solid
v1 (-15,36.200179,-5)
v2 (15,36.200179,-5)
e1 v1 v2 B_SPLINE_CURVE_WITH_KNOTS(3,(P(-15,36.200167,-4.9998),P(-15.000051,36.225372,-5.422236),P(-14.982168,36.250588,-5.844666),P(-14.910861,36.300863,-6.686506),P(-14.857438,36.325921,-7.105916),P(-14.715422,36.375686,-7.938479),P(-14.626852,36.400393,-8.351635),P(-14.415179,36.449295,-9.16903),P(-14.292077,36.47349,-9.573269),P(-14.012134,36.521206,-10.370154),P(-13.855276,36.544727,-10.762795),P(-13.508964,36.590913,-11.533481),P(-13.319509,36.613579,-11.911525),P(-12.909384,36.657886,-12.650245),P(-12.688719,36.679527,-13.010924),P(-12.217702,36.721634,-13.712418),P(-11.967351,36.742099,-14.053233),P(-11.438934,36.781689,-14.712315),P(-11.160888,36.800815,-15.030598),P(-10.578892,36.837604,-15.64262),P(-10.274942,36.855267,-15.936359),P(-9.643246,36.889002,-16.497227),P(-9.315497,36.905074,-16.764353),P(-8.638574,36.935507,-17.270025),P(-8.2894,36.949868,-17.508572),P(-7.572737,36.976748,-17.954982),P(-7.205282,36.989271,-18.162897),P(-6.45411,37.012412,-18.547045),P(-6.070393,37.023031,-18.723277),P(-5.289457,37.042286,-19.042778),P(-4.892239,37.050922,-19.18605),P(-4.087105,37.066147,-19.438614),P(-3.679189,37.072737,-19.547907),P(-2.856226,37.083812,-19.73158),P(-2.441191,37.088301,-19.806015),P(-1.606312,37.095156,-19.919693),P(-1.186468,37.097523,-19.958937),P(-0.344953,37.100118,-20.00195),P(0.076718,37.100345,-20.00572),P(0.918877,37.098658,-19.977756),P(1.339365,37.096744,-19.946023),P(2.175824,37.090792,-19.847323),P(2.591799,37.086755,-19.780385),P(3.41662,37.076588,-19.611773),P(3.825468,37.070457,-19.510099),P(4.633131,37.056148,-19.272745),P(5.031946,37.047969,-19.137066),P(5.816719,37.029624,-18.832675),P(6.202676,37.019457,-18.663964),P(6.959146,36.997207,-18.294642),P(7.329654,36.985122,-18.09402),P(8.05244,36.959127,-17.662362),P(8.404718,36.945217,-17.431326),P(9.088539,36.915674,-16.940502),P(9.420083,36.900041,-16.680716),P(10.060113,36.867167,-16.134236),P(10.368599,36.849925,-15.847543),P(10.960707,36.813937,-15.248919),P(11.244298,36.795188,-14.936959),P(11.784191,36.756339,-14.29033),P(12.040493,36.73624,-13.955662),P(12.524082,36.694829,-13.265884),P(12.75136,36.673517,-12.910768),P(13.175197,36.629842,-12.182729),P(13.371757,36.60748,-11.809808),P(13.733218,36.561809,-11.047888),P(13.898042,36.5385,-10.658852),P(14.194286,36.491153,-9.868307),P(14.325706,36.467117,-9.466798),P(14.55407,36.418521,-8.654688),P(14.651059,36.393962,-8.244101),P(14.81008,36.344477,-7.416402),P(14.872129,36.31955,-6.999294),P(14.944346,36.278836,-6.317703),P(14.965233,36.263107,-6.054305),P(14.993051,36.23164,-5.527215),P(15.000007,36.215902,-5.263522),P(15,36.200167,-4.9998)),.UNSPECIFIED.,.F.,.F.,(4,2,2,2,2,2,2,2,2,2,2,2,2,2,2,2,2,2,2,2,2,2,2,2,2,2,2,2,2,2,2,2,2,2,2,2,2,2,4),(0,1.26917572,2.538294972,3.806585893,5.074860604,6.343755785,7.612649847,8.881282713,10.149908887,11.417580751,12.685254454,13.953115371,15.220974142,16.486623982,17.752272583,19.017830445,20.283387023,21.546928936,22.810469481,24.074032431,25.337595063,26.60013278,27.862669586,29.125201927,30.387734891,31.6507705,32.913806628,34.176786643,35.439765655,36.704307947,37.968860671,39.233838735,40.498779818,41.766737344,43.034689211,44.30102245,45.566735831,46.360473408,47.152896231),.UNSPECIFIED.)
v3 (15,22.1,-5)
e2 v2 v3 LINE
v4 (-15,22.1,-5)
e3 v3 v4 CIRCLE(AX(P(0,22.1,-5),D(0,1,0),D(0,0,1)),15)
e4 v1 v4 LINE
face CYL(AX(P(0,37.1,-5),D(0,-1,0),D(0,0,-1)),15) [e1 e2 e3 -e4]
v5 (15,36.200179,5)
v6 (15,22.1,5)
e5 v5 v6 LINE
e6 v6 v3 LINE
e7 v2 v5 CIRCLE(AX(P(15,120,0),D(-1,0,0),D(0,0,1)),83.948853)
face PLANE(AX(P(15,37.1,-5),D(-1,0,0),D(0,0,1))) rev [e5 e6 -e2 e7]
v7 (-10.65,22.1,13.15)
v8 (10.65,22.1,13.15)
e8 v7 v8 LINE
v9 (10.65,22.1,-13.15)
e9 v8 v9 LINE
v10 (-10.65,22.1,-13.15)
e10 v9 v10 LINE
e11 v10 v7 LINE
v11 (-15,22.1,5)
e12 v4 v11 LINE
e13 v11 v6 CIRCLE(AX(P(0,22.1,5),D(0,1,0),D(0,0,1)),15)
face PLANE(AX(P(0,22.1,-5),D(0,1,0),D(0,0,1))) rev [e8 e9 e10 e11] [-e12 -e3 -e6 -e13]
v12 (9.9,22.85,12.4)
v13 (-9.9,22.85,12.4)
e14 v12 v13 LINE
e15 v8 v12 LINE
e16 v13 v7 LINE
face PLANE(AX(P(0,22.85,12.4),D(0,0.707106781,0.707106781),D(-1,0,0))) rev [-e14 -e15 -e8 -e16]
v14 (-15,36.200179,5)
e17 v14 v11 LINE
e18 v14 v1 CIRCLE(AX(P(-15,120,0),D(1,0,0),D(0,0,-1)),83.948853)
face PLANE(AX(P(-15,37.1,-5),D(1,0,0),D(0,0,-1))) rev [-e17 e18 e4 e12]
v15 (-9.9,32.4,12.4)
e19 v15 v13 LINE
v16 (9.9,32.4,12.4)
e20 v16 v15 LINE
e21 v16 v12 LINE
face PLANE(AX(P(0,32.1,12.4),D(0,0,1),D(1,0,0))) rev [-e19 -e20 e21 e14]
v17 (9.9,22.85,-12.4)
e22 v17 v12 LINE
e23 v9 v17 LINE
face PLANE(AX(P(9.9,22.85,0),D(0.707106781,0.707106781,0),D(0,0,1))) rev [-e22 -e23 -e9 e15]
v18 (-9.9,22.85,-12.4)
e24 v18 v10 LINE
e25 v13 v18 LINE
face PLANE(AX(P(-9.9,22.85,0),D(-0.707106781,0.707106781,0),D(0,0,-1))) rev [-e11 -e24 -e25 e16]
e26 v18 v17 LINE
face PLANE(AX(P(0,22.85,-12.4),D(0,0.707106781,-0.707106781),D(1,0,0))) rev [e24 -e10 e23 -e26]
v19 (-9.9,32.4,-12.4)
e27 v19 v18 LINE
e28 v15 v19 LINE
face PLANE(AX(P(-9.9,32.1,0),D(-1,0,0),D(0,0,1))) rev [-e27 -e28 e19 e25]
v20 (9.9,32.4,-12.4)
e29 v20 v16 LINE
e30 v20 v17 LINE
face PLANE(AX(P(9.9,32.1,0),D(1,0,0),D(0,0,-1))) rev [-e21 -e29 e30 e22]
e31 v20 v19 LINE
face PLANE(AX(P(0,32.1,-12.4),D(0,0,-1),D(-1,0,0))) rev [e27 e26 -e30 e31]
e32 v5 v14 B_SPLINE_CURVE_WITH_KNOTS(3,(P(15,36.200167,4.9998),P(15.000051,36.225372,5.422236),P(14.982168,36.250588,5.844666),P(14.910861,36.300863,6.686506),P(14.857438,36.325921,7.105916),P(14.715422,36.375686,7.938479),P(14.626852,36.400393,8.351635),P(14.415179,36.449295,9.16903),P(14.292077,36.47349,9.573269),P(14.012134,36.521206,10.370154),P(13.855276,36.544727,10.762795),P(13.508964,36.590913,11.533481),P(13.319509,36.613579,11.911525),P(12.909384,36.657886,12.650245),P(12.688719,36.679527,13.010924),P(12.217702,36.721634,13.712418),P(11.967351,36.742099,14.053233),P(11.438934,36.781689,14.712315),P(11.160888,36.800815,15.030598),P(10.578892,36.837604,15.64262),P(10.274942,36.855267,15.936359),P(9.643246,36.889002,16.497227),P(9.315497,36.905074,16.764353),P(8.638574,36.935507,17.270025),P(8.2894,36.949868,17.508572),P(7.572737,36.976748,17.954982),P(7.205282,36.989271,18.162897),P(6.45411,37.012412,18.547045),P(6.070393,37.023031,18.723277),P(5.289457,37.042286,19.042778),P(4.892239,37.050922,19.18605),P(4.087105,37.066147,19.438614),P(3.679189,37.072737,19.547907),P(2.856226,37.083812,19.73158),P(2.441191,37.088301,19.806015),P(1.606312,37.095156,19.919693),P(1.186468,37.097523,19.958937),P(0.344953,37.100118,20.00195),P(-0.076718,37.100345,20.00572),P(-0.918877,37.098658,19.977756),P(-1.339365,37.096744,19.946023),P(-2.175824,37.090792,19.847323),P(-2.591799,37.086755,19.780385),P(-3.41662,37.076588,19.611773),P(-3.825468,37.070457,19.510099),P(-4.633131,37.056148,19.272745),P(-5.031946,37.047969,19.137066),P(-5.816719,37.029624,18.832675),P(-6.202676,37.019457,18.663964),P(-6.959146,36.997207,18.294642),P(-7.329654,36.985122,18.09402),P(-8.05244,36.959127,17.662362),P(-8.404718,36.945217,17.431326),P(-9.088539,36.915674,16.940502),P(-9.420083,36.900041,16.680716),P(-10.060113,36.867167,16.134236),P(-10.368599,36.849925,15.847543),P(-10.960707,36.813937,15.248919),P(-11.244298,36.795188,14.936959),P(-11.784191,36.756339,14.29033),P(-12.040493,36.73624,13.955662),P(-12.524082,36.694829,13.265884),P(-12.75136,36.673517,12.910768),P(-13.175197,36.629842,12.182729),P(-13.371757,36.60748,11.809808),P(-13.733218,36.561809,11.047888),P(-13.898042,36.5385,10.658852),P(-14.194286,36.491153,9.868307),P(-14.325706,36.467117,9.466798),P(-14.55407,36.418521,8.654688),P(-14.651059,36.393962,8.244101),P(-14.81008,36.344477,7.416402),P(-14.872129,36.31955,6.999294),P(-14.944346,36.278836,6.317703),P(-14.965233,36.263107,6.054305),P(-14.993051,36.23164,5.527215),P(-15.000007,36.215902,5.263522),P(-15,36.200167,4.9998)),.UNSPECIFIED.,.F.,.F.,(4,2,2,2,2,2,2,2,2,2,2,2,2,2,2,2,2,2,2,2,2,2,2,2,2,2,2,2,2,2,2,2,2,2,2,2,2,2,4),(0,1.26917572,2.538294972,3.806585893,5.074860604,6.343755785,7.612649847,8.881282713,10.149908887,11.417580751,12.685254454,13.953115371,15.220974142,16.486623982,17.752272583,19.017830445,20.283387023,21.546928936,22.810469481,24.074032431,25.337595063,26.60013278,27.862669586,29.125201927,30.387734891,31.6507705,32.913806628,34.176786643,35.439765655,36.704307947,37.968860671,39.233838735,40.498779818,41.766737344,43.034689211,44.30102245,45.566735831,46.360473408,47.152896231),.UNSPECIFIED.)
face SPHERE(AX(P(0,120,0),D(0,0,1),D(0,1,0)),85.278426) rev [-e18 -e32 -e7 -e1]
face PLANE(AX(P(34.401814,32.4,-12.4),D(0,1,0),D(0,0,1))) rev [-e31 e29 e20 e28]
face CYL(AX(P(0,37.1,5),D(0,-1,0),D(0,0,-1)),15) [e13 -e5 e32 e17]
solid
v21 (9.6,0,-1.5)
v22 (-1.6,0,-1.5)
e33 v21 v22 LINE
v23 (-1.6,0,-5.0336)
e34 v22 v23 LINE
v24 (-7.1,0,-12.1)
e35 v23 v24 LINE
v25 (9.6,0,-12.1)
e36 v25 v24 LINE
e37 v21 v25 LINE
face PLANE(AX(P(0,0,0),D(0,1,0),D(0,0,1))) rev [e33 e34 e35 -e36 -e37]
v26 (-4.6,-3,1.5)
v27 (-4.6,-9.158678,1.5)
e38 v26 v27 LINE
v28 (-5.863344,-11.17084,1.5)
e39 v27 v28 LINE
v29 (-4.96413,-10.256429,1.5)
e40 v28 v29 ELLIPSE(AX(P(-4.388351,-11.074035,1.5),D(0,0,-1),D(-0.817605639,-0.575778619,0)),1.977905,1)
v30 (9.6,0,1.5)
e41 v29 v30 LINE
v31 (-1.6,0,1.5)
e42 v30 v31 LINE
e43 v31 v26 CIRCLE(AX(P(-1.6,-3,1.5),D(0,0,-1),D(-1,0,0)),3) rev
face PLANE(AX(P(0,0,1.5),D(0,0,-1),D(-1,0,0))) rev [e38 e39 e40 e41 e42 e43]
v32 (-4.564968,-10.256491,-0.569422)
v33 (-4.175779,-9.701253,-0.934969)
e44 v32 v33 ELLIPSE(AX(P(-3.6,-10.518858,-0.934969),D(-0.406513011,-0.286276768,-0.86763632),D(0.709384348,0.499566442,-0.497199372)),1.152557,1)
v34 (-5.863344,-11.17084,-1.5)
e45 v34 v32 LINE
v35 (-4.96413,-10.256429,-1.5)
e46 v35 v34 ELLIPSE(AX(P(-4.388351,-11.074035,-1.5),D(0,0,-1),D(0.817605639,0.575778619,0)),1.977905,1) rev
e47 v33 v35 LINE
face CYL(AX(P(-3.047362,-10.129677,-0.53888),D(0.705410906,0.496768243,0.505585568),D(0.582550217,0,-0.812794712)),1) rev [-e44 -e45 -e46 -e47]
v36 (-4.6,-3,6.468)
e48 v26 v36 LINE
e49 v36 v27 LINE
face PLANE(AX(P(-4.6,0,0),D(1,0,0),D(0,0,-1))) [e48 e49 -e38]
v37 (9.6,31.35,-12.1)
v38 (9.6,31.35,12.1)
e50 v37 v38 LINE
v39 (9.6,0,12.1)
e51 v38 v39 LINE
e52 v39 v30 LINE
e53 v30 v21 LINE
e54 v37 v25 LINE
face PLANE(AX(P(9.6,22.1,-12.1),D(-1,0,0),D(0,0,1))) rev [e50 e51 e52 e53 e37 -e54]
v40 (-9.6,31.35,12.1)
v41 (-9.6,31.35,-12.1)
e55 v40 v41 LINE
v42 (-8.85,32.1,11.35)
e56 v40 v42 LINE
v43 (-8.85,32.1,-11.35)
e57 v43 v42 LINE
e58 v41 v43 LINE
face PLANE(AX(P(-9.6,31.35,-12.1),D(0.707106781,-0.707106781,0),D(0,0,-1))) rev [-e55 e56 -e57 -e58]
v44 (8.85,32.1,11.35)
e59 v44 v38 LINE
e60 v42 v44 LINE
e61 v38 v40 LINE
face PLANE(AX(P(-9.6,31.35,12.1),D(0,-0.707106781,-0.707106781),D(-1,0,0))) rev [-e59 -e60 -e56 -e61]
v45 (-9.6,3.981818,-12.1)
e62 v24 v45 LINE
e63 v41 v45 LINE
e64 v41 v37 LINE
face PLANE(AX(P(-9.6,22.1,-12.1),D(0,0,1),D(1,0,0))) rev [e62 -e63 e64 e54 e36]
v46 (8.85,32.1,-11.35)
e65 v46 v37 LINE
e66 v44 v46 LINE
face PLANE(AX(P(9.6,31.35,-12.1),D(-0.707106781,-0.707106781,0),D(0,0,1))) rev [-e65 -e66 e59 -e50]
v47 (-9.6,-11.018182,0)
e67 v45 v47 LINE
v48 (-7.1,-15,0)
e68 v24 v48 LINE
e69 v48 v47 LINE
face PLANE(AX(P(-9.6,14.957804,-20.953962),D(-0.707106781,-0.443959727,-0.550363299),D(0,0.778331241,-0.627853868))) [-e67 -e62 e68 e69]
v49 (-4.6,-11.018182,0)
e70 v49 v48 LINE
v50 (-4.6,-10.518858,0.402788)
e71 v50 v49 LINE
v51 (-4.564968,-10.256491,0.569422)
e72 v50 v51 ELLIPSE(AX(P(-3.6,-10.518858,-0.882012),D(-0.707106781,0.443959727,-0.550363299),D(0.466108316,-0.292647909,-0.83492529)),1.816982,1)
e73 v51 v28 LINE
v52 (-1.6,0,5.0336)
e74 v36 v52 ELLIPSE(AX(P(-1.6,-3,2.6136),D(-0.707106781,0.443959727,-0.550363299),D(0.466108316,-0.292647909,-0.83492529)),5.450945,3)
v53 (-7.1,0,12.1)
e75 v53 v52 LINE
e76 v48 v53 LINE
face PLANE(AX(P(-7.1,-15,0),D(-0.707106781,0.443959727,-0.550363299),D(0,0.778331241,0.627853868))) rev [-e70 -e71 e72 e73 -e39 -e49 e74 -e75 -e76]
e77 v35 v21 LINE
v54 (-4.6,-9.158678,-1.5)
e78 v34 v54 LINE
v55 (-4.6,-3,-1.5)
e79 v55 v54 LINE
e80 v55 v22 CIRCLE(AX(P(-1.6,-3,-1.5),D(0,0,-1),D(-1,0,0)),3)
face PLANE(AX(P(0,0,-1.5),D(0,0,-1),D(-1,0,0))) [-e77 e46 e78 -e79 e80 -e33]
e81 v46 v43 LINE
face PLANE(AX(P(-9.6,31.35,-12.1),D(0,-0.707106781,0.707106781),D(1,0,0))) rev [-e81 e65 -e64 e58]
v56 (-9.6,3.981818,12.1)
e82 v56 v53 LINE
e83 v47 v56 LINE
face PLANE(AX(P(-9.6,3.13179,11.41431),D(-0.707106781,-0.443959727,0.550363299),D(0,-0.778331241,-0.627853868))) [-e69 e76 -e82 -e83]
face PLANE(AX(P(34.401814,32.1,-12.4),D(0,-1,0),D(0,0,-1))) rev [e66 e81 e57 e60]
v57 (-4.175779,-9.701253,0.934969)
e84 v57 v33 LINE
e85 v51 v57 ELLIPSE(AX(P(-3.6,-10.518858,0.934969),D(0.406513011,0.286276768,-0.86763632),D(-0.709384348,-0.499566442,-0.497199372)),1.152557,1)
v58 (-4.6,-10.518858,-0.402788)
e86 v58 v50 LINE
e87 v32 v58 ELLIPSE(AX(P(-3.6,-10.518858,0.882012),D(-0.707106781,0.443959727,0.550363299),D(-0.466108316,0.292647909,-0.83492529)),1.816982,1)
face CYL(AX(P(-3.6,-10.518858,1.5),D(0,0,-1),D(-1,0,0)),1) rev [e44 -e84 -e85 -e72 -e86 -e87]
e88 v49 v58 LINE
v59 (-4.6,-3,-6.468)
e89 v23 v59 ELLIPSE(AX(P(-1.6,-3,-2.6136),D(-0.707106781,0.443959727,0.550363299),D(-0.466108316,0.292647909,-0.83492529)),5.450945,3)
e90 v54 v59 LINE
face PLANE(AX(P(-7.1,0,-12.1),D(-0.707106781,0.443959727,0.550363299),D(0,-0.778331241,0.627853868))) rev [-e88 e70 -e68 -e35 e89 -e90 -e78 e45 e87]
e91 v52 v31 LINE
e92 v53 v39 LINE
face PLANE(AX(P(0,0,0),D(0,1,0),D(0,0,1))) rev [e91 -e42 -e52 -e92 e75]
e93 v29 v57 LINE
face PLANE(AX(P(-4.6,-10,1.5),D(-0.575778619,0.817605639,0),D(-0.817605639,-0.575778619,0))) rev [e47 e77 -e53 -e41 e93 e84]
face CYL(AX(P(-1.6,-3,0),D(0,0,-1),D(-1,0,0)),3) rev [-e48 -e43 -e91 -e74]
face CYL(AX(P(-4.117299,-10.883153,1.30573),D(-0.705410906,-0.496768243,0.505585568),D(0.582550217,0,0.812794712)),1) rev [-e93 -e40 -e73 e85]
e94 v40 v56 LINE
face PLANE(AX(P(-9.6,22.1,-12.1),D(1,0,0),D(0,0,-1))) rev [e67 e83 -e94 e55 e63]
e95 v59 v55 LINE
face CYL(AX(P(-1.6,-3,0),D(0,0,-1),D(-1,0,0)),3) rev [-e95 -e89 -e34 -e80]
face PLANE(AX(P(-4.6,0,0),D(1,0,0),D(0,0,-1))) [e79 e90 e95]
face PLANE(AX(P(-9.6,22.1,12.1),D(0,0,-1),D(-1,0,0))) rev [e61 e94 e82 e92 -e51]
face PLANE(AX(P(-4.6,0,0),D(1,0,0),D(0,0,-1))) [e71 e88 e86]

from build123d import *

# Parameters (mm, degrees)
SKETCH1_W               = 19.2
SKETCH1_H               = 24.2
BOSS_EXTRUDE1_DEPTH     = 22.1
BOSS_EXTRUDE2_DEPTH     = 15
BOSS_EXTRUDE3_DEPTH     = 5
BOSS_EXTRUDE4_DEPTH     = 1.5
CHAMFER1_SIZE           = 2.5
FILLET1_R               = 3
SKETCH9_W               = 19.8
SKETCH9_H               = 24.8
SKETCH9_W_2             = 19.2
SKETCH9_H_2             = 24.2
CUT_EXTRUDE_THIN1_DEPTH = 10
SKETCH10_W              = 24.8
SKETCH10_H              = 0.3
CUT_EXTRUDE1_DEPTH      = 19.2
SKETCH12_W              = 19.8
SKETCH12_H              = 24.8
CUT_EXTRUDE3_DEPTH      = 0.3
CHAMFER2_SIZE           = 0.75
CHAMFER3_SIZE           = 0.75
FILLET2_R               = 1


with BuildPart() as part:
    # Sketch1 → Boss-Extrude1 (new body)
    with BuildSketch(Plane(origin=(0, 0, 0), x_dir=(1, 0, 0), z_dir=(0, 1, 0))):
        Rectangle(SKETCH1_W, SKETCH1_H)
    extrude(amount=BOSS_EXTRUDE1_DEPTH)

    # Sketch2 → Boss-Extrude2 (add)
    with BuildSketch(Plane(origin=(0, 22.1, 0), x_dir=(1, 0, 0), z_dir=(0, 1, 0))):
        with BuildLine():
            Line((15, 5), (15, -5))
            ThreePointArc((15, -5), (0, -20), (-15, -5))
            Line((-15, -5), (-15, 5))
            ThreePointArc((-15, 5), (0, 20), (15, 5))
        make_face()
    extrude(amount=BOSS_EXTRUDE2_DEPTH)

    # Sketch4 → Boss-Extrude3 (add)
    with BuildSketch(Plane.ZY.offset(9.6)):
        Polygon((-12.1, 0), (0, -15), (12.1, 0), align=None)
    extrude(amount=-BOSS_EXTRUDE3_DEPTH)

    # Sketch6 → Boss-Extrude4 (add, symmetric)
    with BuildSketch(Plane.XY):
        Polygon((-4.6, -10), (9.6, 0), (-4.6, 0), align=None)
    extrude(amount=BOSS_EXTRUDE4_DEPTH, both=True)

    # Chamfer1
    # the kernel refuses this chamfer: 2.5 mm, written as the material it takes off along each edge
    with BuildSketch(Plane(origin=(-9.6, 5.004053029, -16.136602777), x_dir=(-0.02749587661058631, 0.6276164868252809, 0.7780369671387777), z_dir=(0, -0.7783312410184162, 0.6278538677548561)), Plane(origin=(-9.6, -20.004053029, -4.036602777), x_dir=(-0.027495876610586317, 0.6276164868252805, -0.778036967138778), z_dir=(0, 0.7783312410184164, 0.6278538677548556))) as chamfer1_piece_1:
        Polygon((CHAMFER1_SIZE * 0.999621916911, -CHAMFER1_SIZE * 0.0274958766106), (-CHAMFER1_SIZE * 0.0274958766106, -CHAMFER1_SIZE * 0.999621916911), (0, 0), align=None)
    extrude(amount=32.130415355, mode=Mode.SUBTRACT)
    with BuildSketch(Plane(origin=(-4.6, 5.004053029, -16.136602777), x_dir=(-0.9996219169112968, -0.017263392477266982, -0.02140089976520685), z_dir=(0, -0.7783312410184162, 0.6278538677548561))) as chamfer1_piece_2_section:
        Polygon((CHAMFER1_SIZE * 0.999621916911, -CHAMFER1_SIZE * 0.0274958766106), (-CHAMFER1_SIZE * 0.0274958766106, -CHAMFER1_SIZE * 0.999621916911), (0, 0), align=None)
    chamfer1_piece_2 = extrude(amount=32.130415355, mode=Mode.PRIVATE)
    chamfer1_piece_2 = split(chamfer1_piece_2, bisect_by=Plane(origin=(-5.457746671, 0, -6.779130054), z_dir=(0, -1, 0)), keep=Keep.TOP, mode=Mode.PRIVATE)
    chamfer1_piece_2 = split(chamfer1_piece_2, bisect_by=Plane(origin=(-5.457746671, -5.291671114, -1.5), z_dir=(0, 0, -1)), keep=Keep.TOP, mode=Mode.PRIVATE)
    add(chamfer1_piece_2, mode=Mode.SUBTRACT)
    with BuildSketch(Plane(origin=(-4.6, 5.004053029, -16.136602777), x_dir=(-0.9996219169112968, -0.017263392477266982, -0.02140089976520685), z_dir=(0, -0.7783312410184162, 0.6278538677548561))) as chamfer1_piece_3_section:
        Polygon((CHAMFER1_SIZE * 0.999621916911, -CHAMFER1_SIZE * 0.0274958766106), (-CHAMFER1_SIZE * 0.0274958766106, -CHAMFER1_SIZE * 0.999621916911), (0, 0), align=None)
    chamfer1_piece_3 = extrude(amount=32.130415355, mode=Mode.PRIVATE)
    chamfer1_piece_3 = split(chamfer1_piece_3, bisect_by=Plane(origin=(-6.522169722, -11.35364065, -0.439205928), z_dir=(0.5757786192909291, -0.8176056393931194, 0)), keep=Keep.TOP, mode=Mode.PRIVATE)
    add(chamfer1_piece_3, mode=Mode.SUBTRACT)
    with BuildSketch(Plane(origin=(-4.6, -20.004053029, -4.036602777), x_dir=(-0.9996219169112968, -0.017263392477266715, 0.021400899765206826), z_dir=(0, 0.7783312410184164, 0.6278538677548556))) as chamfer1_piece_4_section:
        Polygon((CHAMFER1_SIZE * 0.999621916911, -CHAMFER1_SIZE * 0.0274958766106), (-CHAMFER1_SIZE * 0.0274958766106, -CHAMFER1_SIZE * 0.999621916911), (0, 0), align=None)
    chamfer1_piece_4 = extrude(amount=32.130415355, mode=Mode.PRIVATE)
    chamfer1_piece_4 = split(chamfer1_piece_4, bisect_by=Plane(origin=(-6.522169722, -11.35364065, 0.439205928), z_dir=(0.5757786192909291, -0.8176056393931194, 0)), keep=Keep.TOP, mode=Mode.PRIVATE)
    add(chamfer1_piece_4, mode=Mode.SUBTRACT)
    with BuildSketch(Plane(origin=(-4.6, -20.004053029, -4.036602777), x_dir=(-0.9996219169112968, -0.017263392477266715, 0.021400899765206826), z_dir=(0, 0.7783312410184164, 0.6278538677548556))) as chamfer1_piece_5_section:
        Polygon((CHAMFER1_SIZE * 0.999621916911, -CHAMFER1_SIZE * 0.0274958766106), (-CHAMFER1_SIZE * 0.0274958766106, -CHAMFER1_SIZE * 0.999621916911), (0, 0), align=None)
    chamfer1_piece_5 = extrude(amount=32.130415355, mode=Mode.PRIVATE)
    chamfer1_piece_5 = split(chamfer1_piece_5, bisect_by=Plane(origin=(-5.457746671, 0, 6.779130054), z_dir=(0, -1, 0)), keep=Keep.TOP, mode=Mode.PRIVATE)
    chamfer1_piece_5 = split(chamfer1_piece_5, bisect_by=Plane(origin=(-5.457746671, -5.291671114, 1.5), z_dir=(0, 0, 1)), keep=Keep.TOP, mode=Mode.PRIVATE)
    add(chamfer1_piece_5, mode=Mode.SUBTRACT)

    # Fillet1
    fillet1_edges = [part.edges().sort_by_distance(p)[0] for p in [
        (-4.6, 0, -5.193999965),
        (-4.6, 0, 5.193999965),
    ]]
    fillet(fillet1_edges, radius=FILLET1_R)

    # Sketch8 → Cut-Revolve3 (revolve, cut)
    with BuildSketch(Plane(origin=(0, 0, 0), x_dir=(0, 0, -1), z_dir=(1, 0, 0))):
        with BuildLine():
            Line((-85.278426346, 120), (85.278426346, 120))
            ThreePointArc((85.278426346, 120), (0, 34.721573654), (-85.278426346, 120))
        make_face()
    revolve(axis=Axis((0, 120, 85.278426346), (0, 0, -1)), mode=Mode.SUBTRACT)

    # Sketch9 → Cut-Extrude-Thin1 (cut)
    with BuildSketch(Plane.XZ.offset(-22.1)):
        Rectangle(SKETCH9_W, SKETCH9_H)
        Rectangle(SKETCH9_W_2, SKETCH9_H_2, mode=Mode.SUBTRACT)
    extrude(amount=-CUT_EXTRUDE_THIN1_DEPTH, mode=Mode.SUBTRACT)

    # Sketch10 → Cut-Extrude1 (cut)
    with BuildSketch(Plane.ZY.offset(9.6)):
        with Locations((0, 32.25)):
            Rectangle(SKETCH10_W, SKETCH10_H)
    extrude(amount=-CUT_EXTRUDE1_DEPTH, mode=Mode.SUBTRACT)


with BuildPart() as cut_extrude1_piece_1:
    # of the separate pieces the step leaves, piece 1, a body of its own (cut_extrude1_pieces)
    add(part.part.solids().sort_by_distance((-4.6, -3, -6.467999931))[0])

    # Chamfer3
    chamfer3_edges = [cut_extrude1_piece_1.edges().sort_by_distance(p)[0] for p in [
        (0, 32.1, -12.1),
        (9.6, 32.1, 0),
        (0, 32.1, 12.1),
        (-9.6, 32.1, 0),
    ]]
    chamfer(chamfer3_edges, length=CHAMFER3_SIZE)

    # Fillet2
    fillet2_edges = [cut_extrude1_piece_1.edges().sort_by_distance(p)[0] for p in [
        (-4.6, -10, 0),
        (-5.073449943, -10.333415453, -1.160666632),
        (-5.073449943, -10.333415453, 1.160666632),
    ]]
    fillet(fillet2_edges, radius=FILLET2_R)


with BuildPart() as cut_extrude1_piece_2:
    # of the separate pieces the step leaves, piece 2, a body of its own (cut_extrude1_pieces)
    add(part.part.solids().sort_by_distance((9.9, 32.1, 12.4))[0])

    # Sketch12 → Cut-Extrude3 (cut)
    with BuildSketch(Plane.XZ.offset(-32.1)):
        Rectangle(SKETCH12_W, SKETCH12_H)
    extrude(amount=-CUT_EXTRUDE3_DEPTH, mode=Mode.SUBTRACT)

    # Chamfer2
    chamfer2_edges = [cut_extrude1_piece_2.edges().sort_by_distance(p)[0] for p in [
        (9.9, 22.1, 0),
        (0, 22.1, -12.4),
        (-9.9, 22.1, 0),
        (0, 22.1, 12.4),
    ]]
    chamfer(chamfer2_edges, length=CHAMFER2_SIZE)


solid = Compound([cut_extrude1_piece_1.part, cut_extrude1_piece_2.part])
